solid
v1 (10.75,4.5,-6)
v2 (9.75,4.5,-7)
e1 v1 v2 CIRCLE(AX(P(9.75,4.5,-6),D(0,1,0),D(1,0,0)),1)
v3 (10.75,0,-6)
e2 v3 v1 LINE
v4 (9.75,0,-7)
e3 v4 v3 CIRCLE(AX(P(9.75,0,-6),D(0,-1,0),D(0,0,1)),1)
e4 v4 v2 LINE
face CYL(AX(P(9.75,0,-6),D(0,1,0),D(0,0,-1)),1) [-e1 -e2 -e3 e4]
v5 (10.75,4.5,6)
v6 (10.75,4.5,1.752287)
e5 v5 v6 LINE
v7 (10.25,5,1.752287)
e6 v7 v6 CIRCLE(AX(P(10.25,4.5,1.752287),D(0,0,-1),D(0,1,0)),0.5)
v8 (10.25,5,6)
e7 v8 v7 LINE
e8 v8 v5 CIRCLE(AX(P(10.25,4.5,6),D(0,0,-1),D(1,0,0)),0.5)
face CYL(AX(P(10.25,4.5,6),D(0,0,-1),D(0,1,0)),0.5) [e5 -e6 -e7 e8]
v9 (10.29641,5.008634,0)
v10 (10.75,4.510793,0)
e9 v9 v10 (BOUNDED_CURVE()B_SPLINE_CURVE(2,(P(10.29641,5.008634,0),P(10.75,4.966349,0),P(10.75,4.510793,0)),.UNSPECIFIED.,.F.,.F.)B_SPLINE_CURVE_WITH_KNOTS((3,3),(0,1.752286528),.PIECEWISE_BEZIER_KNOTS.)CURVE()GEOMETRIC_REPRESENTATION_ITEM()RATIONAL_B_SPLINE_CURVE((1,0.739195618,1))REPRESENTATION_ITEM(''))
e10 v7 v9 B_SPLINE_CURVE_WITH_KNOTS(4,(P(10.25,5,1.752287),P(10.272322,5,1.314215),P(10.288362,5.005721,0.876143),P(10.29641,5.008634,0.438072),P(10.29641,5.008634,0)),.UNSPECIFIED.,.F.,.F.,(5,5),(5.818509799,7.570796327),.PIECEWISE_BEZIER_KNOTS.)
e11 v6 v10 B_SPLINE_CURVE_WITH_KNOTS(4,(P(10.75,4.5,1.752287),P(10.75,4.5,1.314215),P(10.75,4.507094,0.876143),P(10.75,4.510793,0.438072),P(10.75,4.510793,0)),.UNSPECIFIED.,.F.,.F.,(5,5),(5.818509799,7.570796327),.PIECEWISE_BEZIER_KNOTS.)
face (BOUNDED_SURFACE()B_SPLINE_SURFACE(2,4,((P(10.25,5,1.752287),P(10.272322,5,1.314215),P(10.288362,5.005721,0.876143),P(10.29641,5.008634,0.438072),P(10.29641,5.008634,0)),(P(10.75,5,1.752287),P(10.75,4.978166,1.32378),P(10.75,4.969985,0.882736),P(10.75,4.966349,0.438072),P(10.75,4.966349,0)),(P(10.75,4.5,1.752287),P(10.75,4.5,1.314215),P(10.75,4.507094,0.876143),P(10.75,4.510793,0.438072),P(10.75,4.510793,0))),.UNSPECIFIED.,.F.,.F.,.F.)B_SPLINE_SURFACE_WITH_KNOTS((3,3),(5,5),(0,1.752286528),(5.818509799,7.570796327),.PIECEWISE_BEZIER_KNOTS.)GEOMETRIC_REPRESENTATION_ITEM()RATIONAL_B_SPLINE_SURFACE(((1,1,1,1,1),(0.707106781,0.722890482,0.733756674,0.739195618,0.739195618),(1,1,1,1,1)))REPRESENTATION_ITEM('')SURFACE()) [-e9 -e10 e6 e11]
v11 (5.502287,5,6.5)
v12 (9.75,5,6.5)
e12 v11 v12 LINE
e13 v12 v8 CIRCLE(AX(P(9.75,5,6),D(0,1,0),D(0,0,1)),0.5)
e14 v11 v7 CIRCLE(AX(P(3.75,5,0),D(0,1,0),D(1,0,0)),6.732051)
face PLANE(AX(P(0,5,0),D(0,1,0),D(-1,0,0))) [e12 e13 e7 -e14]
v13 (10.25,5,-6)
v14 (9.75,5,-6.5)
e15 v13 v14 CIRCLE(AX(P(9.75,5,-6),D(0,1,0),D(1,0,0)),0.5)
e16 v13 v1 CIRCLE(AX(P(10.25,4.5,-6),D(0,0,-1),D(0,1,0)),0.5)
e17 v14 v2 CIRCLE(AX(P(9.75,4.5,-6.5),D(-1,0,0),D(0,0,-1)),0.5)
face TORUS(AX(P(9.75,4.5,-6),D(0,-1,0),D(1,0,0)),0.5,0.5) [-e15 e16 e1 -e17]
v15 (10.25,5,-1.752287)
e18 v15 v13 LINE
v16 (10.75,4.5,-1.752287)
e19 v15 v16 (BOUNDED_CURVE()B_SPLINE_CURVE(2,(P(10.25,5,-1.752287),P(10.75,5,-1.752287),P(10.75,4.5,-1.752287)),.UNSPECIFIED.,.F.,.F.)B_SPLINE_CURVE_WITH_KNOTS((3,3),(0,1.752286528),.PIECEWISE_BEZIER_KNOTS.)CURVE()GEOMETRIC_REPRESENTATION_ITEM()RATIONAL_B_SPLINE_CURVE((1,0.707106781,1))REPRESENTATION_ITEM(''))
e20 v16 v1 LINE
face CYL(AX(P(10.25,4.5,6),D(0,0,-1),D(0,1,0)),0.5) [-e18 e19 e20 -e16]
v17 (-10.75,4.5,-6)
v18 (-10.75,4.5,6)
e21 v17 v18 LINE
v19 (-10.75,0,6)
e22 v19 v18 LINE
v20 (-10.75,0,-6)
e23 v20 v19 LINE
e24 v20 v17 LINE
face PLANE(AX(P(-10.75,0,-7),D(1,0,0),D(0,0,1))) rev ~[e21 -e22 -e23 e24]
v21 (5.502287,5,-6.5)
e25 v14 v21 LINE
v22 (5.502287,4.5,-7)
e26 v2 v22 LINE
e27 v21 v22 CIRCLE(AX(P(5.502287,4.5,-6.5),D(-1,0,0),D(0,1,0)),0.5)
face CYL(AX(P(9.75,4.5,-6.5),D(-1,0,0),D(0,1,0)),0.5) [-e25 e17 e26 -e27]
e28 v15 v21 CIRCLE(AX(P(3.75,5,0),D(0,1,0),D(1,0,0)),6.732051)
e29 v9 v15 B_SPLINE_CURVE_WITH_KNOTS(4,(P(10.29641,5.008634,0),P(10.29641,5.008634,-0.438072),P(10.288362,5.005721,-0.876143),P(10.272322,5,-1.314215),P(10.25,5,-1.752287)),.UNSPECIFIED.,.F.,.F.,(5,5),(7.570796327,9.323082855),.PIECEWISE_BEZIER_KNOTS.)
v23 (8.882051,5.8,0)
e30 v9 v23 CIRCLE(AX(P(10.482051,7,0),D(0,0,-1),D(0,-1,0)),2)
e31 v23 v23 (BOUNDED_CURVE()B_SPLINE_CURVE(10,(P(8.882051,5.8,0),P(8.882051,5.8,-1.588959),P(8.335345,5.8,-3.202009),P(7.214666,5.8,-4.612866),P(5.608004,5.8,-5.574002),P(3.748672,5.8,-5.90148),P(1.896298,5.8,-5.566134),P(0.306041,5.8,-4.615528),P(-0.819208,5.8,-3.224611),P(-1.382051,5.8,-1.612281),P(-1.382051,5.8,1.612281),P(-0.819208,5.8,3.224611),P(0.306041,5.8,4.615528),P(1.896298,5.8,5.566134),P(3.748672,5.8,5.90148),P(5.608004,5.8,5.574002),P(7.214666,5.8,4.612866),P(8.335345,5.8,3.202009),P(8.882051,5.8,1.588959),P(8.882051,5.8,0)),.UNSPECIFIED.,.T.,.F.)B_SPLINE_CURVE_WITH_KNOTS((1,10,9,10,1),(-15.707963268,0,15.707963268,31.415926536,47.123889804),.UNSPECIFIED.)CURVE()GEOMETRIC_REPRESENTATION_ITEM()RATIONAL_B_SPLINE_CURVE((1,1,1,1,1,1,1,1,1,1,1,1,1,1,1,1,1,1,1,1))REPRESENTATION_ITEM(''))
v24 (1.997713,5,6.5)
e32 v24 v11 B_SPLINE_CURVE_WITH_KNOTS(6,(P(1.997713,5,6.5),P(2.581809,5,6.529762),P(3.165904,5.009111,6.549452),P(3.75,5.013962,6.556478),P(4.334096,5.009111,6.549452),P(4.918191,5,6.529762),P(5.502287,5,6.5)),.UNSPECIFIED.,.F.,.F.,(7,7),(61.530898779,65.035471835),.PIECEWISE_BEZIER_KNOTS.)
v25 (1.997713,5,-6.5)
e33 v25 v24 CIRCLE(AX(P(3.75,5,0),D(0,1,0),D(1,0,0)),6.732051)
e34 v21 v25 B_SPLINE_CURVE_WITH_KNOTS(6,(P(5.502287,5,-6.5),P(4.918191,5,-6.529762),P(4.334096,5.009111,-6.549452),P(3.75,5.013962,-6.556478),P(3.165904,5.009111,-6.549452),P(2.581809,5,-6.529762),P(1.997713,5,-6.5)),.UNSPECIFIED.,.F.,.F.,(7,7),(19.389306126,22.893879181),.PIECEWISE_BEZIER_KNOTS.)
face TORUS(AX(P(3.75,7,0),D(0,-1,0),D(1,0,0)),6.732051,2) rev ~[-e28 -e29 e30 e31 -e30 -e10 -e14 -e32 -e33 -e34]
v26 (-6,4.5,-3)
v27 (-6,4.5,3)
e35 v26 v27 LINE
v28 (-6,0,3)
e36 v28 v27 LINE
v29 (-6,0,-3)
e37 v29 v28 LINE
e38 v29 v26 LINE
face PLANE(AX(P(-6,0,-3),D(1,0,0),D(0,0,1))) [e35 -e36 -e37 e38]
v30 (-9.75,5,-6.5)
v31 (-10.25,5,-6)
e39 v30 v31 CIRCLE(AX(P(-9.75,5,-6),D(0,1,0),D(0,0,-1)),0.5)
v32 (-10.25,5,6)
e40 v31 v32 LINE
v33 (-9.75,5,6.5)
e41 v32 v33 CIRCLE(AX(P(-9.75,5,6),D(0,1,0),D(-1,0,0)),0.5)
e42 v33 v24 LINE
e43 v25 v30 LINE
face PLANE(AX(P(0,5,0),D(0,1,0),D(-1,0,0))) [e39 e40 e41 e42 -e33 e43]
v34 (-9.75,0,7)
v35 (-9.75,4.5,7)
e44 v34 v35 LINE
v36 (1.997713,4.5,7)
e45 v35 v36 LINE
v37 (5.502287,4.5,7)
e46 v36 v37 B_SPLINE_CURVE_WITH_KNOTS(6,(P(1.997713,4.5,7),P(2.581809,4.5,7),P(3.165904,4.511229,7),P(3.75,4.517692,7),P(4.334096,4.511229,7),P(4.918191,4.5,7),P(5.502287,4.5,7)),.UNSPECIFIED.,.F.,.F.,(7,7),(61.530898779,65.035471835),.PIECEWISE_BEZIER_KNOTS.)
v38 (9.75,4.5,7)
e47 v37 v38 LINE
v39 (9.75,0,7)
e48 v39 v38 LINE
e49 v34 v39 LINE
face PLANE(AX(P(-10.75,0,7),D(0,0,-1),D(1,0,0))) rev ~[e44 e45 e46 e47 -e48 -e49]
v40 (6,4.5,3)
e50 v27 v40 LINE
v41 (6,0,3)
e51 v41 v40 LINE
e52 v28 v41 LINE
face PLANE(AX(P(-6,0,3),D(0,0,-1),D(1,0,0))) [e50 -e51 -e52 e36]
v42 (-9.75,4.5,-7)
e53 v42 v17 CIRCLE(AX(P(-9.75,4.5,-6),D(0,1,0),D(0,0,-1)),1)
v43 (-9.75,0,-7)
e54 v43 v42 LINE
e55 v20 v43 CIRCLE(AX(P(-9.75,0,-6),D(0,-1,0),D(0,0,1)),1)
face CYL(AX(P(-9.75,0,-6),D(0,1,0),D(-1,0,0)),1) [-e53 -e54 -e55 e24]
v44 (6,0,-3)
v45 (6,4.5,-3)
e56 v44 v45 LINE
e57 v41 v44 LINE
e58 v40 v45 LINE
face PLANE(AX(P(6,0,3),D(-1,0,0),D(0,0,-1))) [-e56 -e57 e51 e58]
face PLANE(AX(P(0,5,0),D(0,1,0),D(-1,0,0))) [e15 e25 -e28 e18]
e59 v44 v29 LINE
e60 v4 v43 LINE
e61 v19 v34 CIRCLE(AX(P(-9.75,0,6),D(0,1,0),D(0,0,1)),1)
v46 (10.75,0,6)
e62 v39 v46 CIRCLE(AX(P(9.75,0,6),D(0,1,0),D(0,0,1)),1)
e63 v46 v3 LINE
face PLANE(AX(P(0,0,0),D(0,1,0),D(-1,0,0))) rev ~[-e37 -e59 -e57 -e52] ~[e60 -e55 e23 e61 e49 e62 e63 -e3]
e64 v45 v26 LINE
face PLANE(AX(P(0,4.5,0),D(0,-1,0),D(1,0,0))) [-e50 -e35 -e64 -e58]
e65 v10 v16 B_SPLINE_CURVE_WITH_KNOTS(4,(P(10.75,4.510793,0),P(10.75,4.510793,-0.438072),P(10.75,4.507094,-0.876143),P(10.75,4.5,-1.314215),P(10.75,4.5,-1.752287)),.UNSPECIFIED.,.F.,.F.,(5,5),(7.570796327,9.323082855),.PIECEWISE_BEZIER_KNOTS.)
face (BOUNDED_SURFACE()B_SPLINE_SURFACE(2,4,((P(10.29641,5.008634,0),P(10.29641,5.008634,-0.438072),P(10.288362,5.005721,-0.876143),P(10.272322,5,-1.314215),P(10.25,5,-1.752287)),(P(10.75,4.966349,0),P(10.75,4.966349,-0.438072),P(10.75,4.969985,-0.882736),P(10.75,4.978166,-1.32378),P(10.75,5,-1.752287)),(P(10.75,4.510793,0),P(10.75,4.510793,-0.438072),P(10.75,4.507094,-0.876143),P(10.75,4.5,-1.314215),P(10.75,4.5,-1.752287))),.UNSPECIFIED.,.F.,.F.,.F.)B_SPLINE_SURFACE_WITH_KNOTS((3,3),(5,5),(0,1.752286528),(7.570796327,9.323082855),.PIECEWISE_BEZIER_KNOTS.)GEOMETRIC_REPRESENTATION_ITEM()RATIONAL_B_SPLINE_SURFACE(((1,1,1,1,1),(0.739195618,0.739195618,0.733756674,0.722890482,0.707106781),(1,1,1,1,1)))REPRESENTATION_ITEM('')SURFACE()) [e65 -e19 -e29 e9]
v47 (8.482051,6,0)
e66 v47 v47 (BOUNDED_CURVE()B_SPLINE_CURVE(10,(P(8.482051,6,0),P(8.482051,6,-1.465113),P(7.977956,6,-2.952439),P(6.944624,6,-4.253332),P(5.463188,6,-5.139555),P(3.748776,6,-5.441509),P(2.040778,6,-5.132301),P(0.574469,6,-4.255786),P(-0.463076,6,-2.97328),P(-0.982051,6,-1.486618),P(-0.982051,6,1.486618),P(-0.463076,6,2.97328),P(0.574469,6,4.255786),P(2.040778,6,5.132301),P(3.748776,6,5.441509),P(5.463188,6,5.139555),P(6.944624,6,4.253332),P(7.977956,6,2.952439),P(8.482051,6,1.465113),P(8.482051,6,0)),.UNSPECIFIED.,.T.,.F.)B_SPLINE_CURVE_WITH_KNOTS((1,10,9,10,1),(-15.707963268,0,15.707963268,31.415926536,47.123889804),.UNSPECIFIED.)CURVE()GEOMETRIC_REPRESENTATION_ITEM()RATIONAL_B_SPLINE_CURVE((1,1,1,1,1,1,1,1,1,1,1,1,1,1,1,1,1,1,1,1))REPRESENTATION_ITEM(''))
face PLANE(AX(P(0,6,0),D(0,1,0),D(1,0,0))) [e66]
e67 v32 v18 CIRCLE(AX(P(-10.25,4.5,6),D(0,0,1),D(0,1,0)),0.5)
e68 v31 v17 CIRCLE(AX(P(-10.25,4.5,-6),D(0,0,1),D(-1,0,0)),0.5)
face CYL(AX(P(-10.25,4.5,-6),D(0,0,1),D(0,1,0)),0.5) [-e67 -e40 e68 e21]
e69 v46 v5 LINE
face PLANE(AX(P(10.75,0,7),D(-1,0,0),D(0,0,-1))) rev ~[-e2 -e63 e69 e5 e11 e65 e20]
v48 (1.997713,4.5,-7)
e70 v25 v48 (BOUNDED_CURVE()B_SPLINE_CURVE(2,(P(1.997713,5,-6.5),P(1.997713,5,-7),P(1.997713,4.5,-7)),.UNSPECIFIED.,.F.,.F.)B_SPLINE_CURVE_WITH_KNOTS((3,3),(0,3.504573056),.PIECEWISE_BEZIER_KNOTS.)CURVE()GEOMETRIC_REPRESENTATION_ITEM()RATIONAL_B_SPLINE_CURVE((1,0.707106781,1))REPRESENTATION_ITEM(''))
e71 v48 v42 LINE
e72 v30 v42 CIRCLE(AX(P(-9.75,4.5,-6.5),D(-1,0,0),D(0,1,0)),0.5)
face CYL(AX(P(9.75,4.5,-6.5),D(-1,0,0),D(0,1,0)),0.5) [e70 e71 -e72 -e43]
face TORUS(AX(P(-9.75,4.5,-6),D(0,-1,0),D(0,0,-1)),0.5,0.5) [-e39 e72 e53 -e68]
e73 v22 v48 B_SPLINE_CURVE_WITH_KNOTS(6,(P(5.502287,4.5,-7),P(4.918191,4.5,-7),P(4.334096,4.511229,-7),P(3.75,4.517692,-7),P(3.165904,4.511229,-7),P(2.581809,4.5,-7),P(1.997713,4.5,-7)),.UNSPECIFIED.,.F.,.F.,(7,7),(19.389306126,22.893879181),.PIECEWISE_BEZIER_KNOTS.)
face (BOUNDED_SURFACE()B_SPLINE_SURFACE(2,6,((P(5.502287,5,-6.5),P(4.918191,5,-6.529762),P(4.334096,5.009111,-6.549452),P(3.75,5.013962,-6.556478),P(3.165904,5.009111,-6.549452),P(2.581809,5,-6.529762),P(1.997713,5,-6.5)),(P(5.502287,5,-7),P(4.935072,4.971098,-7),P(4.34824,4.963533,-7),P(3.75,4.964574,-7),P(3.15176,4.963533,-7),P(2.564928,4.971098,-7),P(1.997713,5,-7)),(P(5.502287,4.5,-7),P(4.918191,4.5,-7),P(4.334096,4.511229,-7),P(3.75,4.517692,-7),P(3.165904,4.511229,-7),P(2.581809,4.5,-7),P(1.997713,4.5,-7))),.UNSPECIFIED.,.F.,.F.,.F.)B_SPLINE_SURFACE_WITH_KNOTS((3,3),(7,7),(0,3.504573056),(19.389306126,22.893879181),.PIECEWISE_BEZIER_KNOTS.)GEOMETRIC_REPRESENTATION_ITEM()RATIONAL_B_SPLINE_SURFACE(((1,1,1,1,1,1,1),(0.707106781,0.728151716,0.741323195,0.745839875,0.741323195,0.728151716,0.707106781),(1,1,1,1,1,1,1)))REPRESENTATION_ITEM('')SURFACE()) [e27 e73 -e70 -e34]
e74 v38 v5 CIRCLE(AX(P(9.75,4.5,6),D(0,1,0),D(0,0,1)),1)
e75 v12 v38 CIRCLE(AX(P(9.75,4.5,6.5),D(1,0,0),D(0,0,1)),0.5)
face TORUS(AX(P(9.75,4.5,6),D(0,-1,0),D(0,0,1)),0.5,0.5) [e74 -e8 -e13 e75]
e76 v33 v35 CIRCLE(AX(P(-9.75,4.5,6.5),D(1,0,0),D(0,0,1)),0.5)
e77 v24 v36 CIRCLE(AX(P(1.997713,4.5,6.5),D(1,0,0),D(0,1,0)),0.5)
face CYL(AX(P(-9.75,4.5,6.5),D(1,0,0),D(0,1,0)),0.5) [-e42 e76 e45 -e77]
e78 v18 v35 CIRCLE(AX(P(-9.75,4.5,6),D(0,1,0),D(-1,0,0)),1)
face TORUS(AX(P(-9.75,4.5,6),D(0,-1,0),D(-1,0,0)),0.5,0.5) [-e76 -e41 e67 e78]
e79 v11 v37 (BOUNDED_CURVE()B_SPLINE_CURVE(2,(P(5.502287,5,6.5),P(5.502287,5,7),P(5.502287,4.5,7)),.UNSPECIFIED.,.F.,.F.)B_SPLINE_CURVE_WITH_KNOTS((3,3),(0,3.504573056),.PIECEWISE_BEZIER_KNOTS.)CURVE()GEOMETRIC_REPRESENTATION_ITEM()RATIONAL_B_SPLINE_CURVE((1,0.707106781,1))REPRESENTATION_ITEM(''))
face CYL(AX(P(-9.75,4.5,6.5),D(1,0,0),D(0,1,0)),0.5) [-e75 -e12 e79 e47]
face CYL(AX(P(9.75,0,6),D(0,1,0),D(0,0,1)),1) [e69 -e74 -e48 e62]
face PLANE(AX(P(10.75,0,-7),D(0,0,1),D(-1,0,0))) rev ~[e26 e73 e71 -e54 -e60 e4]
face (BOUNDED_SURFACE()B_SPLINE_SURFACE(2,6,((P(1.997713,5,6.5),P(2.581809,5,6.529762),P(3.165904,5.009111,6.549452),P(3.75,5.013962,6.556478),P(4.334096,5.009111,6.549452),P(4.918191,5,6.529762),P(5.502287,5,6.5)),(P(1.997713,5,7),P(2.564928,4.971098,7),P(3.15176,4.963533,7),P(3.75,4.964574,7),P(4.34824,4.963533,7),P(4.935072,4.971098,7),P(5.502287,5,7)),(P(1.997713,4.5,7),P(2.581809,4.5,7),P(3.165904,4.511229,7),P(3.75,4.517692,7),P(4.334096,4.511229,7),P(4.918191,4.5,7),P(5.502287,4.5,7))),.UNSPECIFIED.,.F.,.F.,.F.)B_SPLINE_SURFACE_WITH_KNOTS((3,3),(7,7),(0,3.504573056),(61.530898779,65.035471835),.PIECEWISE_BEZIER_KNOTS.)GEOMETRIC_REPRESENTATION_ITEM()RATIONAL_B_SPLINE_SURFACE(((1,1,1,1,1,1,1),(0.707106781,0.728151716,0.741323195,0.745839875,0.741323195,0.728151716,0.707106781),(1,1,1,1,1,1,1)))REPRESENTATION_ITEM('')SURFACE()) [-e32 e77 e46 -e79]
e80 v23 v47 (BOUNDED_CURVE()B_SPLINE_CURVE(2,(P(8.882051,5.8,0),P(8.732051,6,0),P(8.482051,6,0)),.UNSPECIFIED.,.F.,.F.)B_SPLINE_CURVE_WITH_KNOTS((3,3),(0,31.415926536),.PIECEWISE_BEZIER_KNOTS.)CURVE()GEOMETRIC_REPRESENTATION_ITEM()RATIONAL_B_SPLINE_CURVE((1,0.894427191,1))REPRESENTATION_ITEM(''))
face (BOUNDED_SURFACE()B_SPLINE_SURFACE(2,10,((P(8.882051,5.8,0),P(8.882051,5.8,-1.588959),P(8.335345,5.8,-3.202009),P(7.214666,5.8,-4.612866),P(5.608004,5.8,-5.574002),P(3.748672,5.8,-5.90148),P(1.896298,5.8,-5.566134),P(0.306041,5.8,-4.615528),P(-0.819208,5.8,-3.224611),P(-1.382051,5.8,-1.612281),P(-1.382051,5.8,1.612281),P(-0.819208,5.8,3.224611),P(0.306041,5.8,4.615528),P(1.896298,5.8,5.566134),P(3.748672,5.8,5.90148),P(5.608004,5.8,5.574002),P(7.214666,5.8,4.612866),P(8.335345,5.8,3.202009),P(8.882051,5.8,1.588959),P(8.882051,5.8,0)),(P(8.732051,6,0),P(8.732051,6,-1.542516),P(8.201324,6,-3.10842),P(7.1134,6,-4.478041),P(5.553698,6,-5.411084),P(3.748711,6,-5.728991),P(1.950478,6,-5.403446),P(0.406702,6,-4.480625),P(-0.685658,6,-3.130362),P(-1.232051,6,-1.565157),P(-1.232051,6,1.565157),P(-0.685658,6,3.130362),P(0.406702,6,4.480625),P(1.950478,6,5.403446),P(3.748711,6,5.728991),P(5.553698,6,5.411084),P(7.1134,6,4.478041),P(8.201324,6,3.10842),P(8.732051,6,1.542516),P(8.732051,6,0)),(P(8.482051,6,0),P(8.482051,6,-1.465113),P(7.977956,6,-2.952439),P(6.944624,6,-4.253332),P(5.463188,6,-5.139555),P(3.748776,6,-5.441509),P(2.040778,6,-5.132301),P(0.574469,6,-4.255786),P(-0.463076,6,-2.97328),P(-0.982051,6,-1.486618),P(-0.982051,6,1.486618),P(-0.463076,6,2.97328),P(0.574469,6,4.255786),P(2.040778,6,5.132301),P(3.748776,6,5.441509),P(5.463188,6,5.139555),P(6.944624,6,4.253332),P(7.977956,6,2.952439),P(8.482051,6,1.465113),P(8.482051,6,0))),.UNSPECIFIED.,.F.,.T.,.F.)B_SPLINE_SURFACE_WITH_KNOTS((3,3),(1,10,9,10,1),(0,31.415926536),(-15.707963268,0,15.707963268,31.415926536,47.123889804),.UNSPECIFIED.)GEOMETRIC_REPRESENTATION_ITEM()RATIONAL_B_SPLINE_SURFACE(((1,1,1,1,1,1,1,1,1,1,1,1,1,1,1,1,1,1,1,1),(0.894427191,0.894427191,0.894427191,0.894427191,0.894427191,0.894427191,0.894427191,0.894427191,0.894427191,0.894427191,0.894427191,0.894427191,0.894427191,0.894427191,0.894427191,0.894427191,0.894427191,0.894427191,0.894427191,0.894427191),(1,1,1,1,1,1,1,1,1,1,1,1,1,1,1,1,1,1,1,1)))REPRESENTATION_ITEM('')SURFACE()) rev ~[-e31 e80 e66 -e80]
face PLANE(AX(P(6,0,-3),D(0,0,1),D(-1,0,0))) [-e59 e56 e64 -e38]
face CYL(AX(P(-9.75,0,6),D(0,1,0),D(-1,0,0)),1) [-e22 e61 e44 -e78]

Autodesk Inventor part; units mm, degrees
ref_plane "YZ Plane" through (0, 0, 0) normal (1, 0, 0) x (0, 1, 0)
ref_plane "XZ Plane" through (0, 0, 0) normal (0, 1, 0) x (-1, 0, 0)
ref_plane "XY Plane" through (0, 0, 0) normal (0, 0, 1) x (1, 0, 0)
sketch "Sketch1" plane through (0, 0, 0) normal (0, 1, 0) x (-1, 0, 0)
  line L0 (10.75, 7) -> (-10.75, 7)
  line L1 (-10.75, 7) -> (-10.75, -7)
  line L2 (-10.75, -7) -> (10.75, -7)
  line L3 (10.75, -7) -> (10.75, 7)
  point P0 (0, 0)
  dimension "d0" = 21.5
  dimension "d1" = 14
  dimension "d2" = 10.75
  dimension "d3" = 7
extrude "Extrusion1" add sketch "Sketch1" along normal blind 5
sketch "Sketch2" plane through (0, 5, 0) normal (0, 1, 0) x (1, 0, 0)
  circle A0 centre (3.75, 0) radius 5
  line L0 (10.75, 7) -> (-10.75, 7) projected
  line L1 (10.75, -7) -> (10.75, 7) projected
  point P0 (0, 0)
  dimension "d6" = 10
  dimension "d7" = 7
  dimension "d8" = 7
extrude "Extrusion2" add sketch "Sketch2" along normal blind 1
fillet "Fillet1" radius 2 1 edges at (-1.25, 5, 0)
fillet "Fillet2" radius 1 4 edges at (10.75, 2.5, 7) (10.75, 2.5, -7) (-10.75, 2.5, 7) (-10.75, 2.5, -7)
fillet "Fillet3" radius 0.5 9 edges at (-1.25, 6, 0) (10.4571, 5, 6.7071) (10.75, 5, 0) (10.4571, 5, -6.7071) (0, 5, -7) (-10.4571, 5, -6.7071) (-10.75, 5, 0) (-10.4571, 5, 6.7071) (0, 5, 7)
sketch "Sketch3" plane through (0, 0, 0) normal (0, -1, 0) x (1, 0, 0)
  line L0 (-6, 3) -> (6, 3)
  line L1 (6, 3) -> (6, -3)
  line L2 (6, -3) -> (-6, -3)
  line L3 (-6, -3) -> (-6, 3)
  line L4 (-9.75, 7) -> (9.75, 7) projected
  point P0 (0, 0)
  dimension "d14" = 12
  dimension "d15" = 6
  dimension "d16" = 4
  dimension "d17" = 6
extrude "Extrusion3" cut sketch "Sketch3" against normal blind 4.5
properties part number "Black_Keyboard_Button"
